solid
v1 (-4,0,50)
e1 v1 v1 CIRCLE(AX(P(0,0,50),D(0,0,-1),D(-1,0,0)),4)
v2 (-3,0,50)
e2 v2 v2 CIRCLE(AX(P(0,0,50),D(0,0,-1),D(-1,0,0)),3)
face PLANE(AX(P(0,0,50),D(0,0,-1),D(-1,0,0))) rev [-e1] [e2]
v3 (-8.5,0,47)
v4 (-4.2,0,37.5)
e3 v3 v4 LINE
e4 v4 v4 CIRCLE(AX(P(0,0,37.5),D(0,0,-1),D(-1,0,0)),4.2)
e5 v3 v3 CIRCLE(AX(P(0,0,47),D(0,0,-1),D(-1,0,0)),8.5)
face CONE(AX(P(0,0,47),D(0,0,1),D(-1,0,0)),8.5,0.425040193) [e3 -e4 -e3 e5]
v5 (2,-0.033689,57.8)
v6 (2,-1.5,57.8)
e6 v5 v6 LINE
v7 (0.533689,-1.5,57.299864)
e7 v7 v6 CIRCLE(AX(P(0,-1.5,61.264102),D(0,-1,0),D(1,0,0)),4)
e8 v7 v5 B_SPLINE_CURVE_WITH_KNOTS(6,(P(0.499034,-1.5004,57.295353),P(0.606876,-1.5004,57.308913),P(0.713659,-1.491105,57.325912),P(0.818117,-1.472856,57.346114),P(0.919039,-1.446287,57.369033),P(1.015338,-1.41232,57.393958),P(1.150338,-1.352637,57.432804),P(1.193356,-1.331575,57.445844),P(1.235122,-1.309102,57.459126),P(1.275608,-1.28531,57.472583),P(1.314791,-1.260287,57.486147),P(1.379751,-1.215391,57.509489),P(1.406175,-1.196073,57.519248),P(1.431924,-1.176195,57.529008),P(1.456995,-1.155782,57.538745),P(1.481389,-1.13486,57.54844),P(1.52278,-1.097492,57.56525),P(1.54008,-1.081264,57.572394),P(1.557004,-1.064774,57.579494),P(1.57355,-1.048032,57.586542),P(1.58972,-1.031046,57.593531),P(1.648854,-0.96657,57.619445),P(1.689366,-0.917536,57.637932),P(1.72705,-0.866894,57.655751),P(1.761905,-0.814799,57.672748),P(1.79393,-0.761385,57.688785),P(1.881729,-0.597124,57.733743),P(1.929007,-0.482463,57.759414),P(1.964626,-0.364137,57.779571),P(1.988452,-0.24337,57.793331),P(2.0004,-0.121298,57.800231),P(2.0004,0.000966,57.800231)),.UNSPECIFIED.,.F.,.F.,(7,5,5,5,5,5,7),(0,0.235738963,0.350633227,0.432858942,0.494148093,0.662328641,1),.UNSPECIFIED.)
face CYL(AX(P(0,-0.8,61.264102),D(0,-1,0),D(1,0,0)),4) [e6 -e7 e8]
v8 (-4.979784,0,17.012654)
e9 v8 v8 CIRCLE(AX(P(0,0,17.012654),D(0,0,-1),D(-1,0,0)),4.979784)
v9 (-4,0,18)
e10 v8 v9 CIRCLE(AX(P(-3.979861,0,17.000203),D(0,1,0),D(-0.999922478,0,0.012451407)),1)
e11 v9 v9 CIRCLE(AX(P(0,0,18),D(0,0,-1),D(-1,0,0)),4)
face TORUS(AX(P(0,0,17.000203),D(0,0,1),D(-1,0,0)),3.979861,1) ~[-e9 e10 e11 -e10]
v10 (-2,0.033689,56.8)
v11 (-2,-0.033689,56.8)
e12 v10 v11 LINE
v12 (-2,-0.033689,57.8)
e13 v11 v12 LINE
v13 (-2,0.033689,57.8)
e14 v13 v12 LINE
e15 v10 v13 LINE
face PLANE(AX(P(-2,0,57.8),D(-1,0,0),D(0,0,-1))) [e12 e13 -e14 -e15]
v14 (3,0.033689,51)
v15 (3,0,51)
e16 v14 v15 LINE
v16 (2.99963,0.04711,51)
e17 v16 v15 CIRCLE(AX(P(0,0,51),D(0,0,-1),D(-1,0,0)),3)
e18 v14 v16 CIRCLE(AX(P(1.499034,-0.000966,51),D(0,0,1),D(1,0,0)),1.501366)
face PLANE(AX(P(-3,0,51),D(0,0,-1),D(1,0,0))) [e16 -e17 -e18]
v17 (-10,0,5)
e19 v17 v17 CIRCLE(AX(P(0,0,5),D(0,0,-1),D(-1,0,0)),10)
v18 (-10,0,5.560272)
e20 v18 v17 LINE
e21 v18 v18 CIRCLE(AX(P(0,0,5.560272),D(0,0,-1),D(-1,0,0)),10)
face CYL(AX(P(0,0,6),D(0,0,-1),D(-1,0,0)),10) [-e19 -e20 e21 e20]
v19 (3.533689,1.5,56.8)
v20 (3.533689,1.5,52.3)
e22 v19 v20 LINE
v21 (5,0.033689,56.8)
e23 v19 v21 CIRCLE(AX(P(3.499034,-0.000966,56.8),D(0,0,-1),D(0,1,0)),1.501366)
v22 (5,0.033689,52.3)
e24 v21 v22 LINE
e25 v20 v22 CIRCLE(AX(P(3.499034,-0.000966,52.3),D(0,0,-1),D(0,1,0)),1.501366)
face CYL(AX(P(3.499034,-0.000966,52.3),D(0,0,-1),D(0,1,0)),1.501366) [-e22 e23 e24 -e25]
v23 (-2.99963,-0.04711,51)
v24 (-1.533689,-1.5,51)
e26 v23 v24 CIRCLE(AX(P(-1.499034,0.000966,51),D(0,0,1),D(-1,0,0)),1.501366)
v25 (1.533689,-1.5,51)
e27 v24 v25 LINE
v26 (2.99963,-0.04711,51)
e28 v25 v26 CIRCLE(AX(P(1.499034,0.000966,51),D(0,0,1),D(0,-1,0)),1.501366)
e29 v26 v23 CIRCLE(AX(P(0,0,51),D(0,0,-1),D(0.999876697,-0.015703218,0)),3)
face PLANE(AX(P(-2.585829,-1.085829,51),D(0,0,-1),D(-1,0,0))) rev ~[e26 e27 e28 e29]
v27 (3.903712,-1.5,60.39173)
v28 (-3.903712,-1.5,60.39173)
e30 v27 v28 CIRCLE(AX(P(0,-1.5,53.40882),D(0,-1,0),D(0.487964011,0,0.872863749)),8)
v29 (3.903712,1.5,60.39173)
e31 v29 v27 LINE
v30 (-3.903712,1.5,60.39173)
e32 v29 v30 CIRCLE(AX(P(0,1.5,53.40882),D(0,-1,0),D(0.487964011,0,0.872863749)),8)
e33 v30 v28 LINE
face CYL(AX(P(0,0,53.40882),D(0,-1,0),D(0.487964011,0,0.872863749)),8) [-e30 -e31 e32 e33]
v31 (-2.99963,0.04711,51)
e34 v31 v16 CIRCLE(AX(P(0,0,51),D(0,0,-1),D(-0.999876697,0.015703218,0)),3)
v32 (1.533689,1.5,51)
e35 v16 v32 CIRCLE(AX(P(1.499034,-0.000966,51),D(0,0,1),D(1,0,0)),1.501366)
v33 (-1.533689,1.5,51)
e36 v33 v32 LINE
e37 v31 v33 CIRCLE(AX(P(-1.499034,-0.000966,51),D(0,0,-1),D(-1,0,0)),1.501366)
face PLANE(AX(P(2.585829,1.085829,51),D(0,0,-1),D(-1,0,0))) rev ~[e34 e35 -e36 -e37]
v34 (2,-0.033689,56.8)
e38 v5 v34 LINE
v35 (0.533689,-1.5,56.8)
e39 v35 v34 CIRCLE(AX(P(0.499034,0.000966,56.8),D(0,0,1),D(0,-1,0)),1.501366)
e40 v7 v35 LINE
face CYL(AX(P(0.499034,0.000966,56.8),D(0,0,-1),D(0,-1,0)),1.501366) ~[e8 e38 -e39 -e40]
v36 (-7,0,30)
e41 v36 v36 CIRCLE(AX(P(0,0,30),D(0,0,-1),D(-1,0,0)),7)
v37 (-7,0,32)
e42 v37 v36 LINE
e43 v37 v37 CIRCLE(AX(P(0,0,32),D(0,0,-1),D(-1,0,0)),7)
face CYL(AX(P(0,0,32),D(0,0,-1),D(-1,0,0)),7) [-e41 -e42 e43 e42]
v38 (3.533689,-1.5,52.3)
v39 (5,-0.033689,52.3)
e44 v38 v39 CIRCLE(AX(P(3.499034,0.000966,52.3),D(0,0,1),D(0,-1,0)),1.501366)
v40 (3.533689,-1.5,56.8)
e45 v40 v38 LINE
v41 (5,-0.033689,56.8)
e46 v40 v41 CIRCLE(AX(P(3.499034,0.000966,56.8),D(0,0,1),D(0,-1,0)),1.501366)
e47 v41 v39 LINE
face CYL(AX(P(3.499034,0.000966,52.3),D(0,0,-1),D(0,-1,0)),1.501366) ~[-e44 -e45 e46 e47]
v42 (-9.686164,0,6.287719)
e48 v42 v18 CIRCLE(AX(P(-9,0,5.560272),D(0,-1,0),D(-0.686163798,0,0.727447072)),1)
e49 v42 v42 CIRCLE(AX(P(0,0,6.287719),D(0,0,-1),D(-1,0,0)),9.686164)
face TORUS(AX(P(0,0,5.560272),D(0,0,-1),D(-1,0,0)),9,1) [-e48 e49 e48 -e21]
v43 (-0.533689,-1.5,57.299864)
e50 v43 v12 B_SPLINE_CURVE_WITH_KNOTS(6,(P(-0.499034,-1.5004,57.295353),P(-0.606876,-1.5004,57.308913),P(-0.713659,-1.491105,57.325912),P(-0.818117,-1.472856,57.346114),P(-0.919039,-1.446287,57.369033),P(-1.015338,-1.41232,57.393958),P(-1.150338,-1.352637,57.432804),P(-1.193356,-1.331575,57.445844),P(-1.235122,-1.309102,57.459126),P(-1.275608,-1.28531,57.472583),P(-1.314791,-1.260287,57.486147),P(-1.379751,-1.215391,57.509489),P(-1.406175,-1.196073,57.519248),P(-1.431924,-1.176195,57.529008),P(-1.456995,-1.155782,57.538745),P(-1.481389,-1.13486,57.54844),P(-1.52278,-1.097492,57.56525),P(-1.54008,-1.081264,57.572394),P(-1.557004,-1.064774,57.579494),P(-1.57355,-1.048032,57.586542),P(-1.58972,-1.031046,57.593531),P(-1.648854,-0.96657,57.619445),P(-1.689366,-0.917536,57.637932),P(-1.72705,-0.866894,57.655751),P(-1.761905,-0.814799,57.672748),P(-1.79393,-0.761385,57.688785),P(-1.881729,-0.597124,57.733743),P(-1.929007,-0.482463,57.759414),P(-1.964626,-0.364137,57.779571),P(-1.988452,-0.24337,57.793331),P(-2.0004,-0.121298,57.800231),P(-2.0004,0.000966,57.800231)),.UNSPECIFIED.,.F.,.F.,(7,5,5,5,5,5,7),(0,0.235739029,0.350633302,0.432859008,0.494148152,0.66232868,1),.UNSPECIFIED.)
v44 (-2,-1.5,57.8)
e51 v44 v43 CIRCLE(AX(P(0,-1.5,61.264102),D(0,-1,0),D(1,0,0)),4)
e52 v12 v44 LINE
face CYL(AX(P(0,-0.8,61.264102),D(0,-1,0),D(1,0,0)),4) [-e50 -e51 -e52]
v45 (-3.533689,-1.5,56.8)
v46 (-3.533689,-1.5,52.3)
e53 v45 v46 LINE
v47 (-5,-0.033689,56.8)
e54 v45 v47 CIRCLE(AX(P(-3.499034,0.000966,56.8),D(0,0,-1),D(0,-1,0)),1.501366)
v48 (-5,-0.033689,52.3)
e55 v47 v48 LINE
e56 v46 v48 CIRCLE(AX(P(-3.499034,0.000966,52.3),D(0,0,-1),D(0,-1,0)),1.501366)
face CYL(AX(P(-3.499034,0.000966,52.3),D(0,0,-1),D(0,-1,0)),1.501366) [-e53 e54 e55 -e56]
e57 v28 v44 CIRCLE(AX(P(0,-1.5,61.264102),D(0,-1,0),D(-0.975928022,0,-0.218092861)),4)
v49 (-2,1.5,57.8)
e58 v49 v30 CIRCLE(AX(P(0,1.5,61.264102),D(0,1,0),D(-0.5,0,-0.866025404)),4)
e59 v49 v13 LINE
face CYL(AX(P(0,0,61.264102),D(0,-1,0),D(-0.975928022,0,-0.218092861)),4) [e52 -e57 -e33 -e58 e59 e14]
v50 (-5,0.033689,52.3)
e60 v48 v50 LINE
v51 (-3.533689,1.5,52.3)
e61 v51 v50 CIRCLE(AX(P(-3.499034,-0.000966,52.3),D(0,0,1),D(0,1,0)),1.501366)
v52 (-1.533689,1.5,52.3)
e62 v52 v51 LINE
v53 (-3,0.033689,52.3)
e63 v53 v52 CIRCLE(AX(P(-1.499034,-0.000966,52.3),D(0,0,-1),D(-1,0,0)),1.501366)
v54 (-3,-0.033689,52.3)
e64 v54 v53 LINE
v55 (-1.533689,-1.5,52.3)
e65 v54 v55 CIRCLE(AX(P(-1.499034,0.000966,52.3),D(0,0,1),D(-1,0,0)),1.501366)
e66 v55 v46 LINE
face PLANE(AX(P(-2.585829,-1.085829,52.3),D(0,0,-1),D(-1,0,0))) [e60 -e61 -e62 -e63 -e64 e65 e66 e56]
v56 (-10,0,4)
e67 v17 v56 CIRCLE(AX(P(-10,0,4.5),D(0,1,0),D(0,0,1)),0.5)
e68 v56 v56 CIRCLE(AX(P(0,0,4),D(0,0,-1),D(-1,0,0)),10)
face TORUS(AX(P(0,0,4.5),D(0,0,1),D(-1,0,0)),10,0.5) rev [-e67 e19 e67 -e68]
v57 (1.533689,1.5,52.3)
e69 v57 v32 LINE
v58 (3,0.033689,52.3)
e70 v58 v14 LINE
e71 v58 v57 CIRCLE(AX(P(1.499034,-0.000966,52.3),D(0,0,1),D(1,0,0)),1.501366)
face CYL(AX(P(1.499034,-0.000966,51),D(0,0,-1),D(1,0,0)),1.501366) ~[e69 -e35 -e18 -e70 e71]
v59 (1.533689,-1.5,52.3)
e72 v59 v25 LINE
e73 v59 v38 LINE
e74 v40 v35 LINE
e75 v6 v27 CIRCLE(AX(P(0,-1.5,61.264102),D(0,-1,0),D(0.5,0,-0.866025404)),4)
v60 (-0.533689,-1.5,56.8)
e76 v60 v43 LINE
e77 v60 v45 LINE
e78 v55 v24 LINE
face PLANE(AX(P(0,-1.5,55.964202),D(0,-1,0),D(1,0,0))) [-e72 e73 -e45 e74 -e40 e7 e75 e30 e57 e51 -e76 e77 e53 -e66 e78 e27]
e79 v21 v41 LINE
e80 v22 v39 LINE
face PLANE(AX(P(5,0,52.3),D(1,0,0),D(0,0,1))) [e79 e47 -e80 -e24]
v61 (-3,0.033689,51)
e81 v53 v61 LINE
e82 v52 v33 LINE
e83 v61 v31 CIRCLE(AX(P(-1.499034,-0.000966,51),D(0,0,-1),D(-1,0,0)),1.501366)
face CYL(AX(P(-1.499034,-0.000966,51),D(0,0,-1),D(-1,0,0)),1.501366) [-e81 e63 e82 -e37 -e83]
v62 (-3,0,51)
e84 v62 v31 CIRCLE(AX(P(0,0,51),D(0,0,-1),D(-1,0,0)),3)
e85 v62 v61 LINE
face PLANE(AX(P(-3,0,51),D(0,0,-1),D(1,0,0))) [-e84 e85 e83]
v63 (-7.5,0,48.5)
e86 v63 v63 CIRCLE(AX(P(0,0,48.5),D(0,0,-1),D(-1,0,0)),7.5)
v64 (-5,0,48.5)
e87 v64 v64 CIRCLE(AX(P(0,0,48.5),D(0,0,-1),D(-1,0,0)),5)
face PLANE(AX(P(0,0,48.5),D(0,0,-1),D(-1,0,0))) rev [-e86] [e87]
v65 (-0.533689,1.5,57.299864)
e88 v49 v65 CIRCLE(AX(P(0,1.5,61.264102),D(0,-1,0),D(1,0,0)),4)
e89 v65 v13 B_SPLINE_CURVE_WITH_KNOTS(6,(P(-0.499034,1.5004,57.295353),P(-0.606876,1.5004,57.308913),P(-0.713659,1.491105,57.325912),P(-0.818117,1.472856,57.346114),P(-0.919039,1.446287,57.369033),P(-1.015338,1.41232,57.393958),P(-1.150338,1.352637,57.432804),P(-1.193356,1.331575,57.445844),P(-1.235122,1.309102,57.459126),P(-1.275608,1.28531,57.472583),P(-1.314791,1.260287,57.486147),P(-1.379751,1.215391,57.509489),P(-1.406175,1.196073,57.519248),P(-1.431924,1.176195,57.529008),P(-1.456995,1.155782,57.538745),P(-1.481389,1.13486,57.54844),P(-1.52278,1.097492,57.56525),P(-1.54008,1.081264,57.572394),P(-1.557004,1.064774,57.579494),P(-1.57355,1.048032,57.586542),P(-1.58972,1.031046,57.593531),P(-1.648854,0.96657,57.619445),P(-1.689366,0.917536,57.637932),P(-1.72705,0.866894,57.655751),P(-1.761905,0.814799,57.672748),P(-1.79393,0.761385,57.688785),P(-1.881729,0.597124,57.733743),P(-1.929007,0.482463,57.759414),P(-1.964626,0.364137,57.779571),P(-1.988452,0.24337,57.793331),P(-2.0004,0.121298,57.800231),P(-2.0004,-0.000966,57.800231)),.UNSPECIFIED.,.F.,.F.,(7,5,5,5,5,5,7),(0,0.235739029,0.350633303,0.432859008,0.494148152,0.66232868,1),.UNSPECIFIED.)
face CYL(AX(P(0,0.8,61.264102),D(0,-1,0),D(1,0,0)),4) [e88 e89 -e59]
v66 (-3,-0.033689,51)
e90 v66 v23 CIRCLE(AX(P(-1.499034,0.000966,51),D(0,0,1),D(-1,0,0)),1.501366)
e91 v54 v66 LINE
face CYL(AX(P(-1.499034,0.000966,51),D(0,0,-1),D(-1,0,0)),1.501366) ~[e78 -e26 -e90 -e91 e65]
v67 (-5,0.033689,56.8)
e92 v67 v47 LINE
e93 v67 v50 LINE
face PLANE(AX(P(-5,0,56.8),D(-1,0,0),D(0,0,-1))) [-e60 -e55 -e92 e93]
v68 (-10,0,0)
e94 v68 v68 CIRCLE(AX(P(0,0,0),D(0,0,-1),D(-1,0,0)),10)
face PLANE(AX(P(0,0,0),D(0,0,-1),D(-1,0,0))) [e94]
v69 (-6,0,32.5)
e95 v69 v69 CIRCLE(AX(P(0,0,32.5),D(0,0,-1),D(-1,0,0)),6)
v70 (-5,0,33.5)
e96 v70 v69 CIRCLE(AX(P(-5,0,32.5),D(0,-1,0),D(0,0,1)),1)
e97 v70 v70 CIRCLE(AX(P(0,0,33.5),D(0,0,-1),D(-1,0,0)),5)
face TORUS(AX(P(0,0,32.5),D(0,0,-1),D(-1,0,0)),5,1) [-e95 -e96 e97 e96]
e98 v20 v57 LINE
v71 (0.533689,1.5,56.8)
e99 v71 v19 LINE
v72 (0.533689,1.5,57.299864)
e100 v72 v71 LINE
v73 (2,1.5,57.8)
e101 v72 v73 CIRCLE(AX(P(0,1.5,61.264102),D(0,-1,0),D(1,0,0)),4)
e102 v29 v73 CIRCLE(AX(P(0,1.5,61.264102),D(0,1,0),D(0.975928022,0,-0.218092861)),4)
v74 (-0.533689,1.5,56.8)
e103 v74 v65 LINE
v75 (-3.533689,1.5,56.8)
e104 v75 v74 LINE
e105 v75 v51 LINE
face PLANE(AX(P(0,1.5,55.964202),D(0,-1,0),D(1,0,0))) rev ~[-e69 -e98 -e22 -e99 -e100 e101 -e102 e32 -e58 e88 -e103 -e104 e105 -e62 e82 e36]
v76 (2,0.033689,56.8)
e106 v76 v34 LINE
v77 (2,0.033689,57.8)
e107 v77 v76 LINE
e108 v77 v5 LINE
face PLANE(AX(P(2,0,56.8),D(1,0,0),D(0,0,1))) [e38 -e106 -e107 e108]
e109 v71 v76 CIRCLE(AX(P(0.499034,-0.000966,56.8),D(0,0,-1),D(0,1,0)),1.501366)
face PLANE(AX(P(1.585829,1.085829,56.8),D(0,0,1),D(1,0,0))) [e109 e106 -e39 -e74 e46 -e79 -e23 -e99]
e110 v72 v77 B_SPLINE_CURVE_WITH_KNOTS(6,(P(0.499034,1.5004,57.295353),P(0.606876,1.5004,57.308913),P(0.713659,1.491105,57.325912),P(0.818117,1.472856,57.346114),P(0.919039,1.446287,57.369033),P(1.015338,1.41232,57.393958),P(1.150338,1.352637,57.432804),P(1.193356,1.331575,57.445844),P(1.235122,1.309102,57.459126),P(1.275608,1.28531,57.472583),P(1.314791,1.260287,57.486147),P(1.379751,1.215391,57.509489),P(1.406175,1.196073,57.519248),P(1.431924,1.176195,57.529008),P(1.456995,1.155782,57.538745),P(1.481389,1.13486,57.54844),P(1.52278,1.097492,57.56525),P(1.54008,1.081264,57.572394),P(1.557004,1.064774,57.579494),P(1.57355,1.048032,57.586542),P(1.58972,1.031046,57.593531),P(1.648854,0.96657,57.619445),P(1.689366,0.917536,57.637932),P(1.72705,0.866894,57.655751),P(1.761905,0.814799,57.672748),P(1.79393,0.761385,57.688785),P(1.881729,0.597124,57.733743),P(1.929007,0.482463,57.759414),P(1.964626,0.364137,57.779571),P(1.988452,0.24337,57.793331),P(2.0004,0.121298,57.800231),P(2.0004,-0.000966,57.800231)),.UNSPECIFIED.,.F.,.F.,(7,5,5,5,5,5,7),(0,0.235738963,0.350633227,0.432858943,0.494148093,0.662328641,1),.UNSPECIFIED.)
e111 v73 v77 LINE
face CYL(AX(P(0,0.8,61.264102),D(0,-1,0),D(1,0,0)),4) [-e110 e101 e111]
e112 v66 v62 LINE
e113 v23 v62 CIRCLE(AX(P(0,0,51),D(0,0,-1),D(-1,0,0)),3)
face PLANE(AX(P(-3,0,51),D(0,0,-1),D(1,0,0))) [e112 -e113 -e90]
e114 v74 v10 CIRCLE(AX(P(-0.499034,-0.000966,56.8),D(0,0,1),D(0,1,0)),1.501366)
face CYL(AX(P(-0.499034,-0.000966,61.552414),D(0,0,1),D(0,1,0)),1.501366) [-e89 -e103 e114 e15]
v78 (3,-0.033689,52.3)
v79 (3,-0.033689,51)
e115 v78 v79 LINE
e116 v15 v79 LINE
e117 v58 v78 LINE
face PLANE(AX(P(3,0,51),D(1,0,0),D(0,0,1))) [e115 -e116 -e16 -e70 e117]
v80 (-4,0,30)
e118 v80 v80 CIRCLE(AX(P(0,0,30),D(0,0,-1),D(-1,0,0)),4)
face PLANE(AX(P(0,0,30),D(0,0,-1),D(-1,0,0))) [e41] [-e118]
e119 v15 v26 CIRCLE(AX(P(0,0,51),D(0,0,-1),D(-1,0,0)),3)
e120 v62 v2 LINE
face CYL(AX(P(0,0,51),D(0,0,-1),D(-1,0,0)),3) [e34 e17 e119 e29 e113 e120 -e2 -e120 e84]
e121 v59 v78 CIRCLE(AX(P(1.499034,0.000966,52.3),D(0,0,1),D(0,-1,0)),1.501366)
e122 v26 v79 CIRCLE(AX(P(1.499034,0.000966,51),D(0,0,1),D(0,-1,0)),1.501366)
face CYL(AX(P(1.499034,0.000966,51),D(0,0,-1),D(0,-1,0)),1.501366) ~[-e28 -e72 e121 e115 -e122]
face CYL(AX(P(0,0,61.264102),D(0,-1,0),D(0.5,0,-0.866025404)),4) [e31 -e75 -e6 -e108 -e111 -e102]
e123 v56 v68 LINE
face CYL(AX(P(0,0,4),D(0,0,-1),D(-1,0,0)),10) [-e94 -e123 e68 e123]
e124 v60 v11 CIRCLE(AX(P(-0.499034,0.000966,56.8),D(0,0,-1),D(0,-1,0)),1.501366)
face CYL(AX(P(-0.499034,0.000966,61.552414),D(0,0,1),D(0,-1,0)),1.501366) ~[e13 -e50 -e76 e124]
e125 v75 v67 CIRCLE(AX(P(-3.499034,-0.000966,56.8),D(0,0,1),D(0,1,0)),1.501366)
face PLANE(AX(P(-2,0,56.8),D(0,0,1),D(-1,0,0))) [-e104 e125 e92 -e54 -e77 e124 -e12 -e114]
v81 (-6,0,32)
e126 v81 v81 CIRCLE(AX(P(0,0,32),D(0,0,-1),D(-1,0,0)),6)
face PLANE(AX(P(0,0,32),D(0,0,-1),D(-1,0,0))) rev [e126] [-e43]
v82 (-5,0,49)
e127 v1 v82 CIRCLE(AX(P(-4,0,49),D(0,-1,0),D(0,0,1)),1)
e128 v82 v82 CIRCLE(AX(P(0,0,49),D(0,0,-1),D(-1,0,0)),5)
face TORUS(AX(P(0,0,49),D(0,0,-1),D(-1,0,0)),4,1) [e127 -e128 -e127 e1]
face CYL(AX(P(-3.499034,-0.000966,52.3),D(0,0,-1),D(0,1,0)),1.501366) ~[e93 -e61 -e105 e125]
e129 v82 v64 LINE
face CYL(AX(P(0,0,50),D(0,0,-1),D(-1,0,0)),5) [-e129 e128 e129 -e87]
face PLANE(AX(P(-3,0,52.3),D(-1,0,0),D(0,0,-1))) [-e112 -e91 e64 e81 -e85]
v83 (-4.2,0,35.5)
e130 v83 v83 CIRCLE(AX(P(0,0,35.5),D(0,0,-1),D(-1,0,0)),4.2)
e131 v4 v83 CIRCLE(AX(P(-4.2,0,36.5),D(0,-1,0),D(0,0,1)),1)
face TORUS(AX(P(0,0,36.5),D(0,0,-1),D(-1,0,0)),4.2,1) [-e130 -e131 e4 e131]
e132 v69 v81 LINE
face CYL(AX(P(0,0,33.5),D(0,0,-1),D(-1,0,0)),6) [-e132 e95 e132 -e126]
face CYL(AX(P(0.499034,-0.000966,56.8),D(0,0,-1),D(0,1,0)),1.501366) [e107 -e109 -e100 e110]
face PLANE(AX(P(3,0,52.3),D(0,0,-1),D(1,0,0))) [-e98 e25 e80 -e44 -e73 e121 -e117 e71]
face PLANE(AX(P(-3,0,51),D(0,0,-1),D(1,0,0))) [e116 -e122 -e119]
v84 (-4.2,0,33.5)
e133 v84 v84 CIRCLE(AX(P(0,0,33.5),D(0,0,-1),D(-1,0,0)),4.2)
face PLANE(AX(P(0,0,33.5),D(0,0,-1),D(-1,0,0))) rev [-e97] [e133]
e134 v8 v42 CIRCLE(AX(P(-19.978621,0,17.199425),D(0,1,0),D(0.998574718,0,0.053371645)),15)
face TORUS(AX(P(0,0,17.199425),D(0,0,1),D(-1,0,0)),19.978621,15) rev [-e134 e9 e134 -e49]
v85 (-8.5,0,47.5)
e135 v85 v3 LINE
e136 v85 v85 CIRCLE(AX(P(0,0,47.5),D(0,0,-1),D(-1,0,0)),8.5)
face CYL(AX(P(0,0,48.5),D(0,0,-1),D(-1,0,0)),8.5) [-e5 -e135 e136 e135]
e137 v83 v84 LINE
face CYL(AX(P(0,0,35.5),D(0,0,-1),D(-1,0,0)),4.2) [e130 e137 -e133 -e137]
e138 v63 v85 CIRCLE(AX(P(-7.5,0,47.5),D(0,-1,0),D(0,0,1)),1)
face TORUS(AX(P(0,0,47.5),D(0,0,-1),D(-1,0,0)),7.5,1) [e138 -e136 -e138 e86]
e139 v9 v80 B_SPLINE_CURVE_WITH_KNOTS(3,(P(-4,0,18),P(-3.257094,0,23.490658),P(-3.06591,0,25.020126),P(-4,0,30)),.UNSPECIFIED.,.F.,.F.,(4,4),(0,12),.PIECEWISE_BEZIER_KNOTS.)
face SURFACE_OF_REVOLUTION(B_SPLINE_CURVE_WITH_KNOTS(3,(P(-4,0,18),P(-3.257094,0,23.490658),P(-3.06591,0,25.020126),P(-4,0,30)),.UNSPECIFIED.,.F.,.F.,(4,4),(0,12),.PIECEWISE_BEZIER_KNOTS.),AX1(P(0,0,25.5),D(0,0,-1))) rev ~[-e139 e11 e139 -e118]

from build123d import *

# Parameters (mm, degrees)
F4_DEPTH     = 1.5
F5_T1_DEPTH  = 4.5
F5_T3_DEPTH  = 1.3
F5_T8_DEPTH  = 4.7524143468
F5_S9_R      = 4
F5_T10_DEPTH = 4
F5_T14_DEPTH = 4.7524143468
F5_S15_R     = 4
F5_T16_DEPTH = 4
F5_T20_DEPTH = 4.7524143468
F5_S21_R     = 4
F5_T22_DEPTH = 4
F5_T26_DEPTH = 4.7524143468
F5_S27_R     = 4
F5_T28_DEPTH = 4


# Not quite as in the source:
# - a fillet or chamfer that OpenCascade refuses, or shapes differently, is made with other operations: its cross-section is extruded or revolved along the edge and cut away or added


with BuildPart() as f1:
    # F0 (on Front) → F1 (revolve)
    with BuildSketch(Plane.XZ):
        with BuildLine():
            Line((-10, 0), (0, 0))
            Line((0, 0), (0, 51))
            Line((0, 51), (-3, 51))
            Line((-3, 51), (-3, 50))
            Line((-3, 50), (-5, 50))
            Line((-5, 50), (-5, 48.5))
            Line((-5, 48.5), (-8.5, 48.5))
            Line((-8.5, 48.5), (-8.5, 47))
            Line((-8.5, 47), (-4.2, 37.5))
            ThreePointArc((-4.2, 37.5), (-5.2, 36.5), (-4.2, 35.5))
            Line((-4.2, 35.5), (-4.2, 33.5))
            Line((-4.2, 33.5), (-6, 33.5))
            Line((-6, 33.5), (-6, 32))
            Line((-6, 32), (-7, 32))
            Line((-7, 32), (-7, 30))
            Line((-7, 30), (-4, 30))
            add(Edge.make_bspline(
                [(-4, 18), (-3.2570937183, 23.4906580299), (-3.0659101903, 25.0201262534), (-4, 30)],
                knots=[0, 0, 0, 0, 12, 12, 12, 12], degree=3))
            Line((-4, 18), (-5, 18))
            ThreePointArc((-5, 18), (-6.1324669242, 11.4301945518), (-10, 6))
            Line((-10, 6), (-10, 5))
            ThreePointArc((-10, 5), (-9.5, 4.5), (-10, 4))
            Line((-10, 4), (-10, 0))
        make_face()
    revolve(axis=Axis((0, 0, 25.5), (0, 0, -1)))

    # F2: fillet of radius 1 on 5 edges, made by hand

    # F2_s1 → F2_t2 (revolve, cut)
    with BuildSketch(Plane.XZ):
        with BuildLine():
            ThreePointArc((-9.6861637982, 6.2877192457), (-9.9181949135, 5.9564010683), (-10, 5.560272174))
            Line((-10, 5.560272174), (-10, 6))
            ThreePointArc((-10, 6), (-9.8420610087, 6.1427460638), (-9.6861637982, 6.2877192457))
        make_face()
    revolve(axis=Axis((0, 0, 6), (0, 0, -1)), mode=Mode.SUBTRACT)

    # F2_s3 → F2_t4 (revolve, cut)
    with BuildSketch(Plane.XZ):
        with BuildLine():
            ThreePointArc((-4.979783597, 17.0126542149), (-4.6896809685, 17.7045860706), (-4, 18))
            Line((-4, 18), (-5, 18))
            ThreePointArc((-5, 18), (-4.9817641292, 17.5064935256), (-4.979783597, 17.0126542149))
        make_face()
    revolve(axis=Axis((0, 0, 18), (0, 0, -1)), mode=Mode.SUBTRACT)

    # F2_s5 → F2_t6 (revolve, cut)
    with BuildSketch(Plane.XZ):
        with BuildLine():
            ThreePointArc((-5, 33.5), (-5.7071067812, 33.2071067812), (-6, 32.5))
            Line((-6, 32.5), (-6, 33.5))
            Line((-6, 33.5), (-5, 33.5))
        make_face()
    revolve(axis=Axis((0, 0, 33.5), (0, 0, -1)), mode=Mode.SUBTRACT)

    # F2_s7 → F2_t8 (revolve, cut)
    with BuildSketch(Plane.XZ):
        with BuildLine():
            ThreePointArc((-7.5, 48.5), (-8.2071067812, 48.2071067812), (-8.5, 47.5))
            Line((-8.5, 47.5), (-8.5, 48.5))
            Line((-8.5, 48.5), (-7.5, 48.5))
        make_face()
    revolve(axis=Axis((0, 0, 48.5), (0, 0, -1)), mode=Mode.SUBTRACT)

    # F2_s9 → F2_t10 (revolve, cut)
    with BuildSketch(Plane.XZ):
        with BuildLine():
            ThreePointArc((-4, 50), (-4.7071067812, 49.7071067812), (-5, 49))
            Line((-5, 49), (-5, 50))
            Line((-5, 50), (-4, 50))
        make_face()
    revolve(axis=Axis((0, 0, 50), (0, 0, -1)), mode=Mode.SUBTRACT)

    # F3 (on Front) → F4 (join, symmetric)
    with BuildSketch(Plane.XZ):
        with BuildLine():
            Line((-3, 51), (0, 51))
            Line((0, 51), (3, 51))
            Line((3, 51), (3, 52.3))
            Line((3, 52.3), (5, 52.3))
            Line((5, 52.3), (5, 56.8))
            Line((5, 56.8), (2, 56.8))
            Line((2, 56.8), (2, 57.8))
            ThreePointArc((2, 57.8), (3.2237742518, 58.8961321107), (3.903712088, 60.3917301725))
            ThreePointArc((3.903712088, 60.3917301725), (0, 61.4088201821), (-3.903712088, 60.3917301725))
            ThreePointArc((-3.903712088, 60.3917301725), (-3.2237742518, 58.8961321107), (-2, 57.8))
            Line((-2, 57.8), (-2, 56.8))
            Line((-2, 56.8), (-5, 56.8))
            Line((-5, 56.8), (-5, 52.3))
            Line((-5, 52.3), (-3, 52.3))
            Line((-3, 52.3), (-3, 51))
        make_face()
    extrude(amount=F4_DEPTH, both=True)

    # F5: fillet of radius 1.5 on 12 edges, made by hand

    # F5_s2 → F5_t1 (cut)
    with BuildSketch(Plane.XY.offset(52.3)):
        with BuildLine():
            ThreePointArc((-3.4990343146, -1.5004), (-4.5606601718, -1.0606601718), (-5.0004, 0.0009656854))
            Line((-5.0004, 0.0009656854), (-5.1505365685, 0.0009656854))
            ThreePointArc((-5.1505365685, 0.0009656854), (-5.1501365685, -0.7495171573), (-5.1501365685, -1.5))
            Line((-5.1501365685, -1.5), (-5, -1.6501365685))
            ThreePointArc((-5, -1.6501365685), (-4.2495171573, -1.6501365685), (-3.4990343146, -1.6505365685))
            Line((-3.4990343146, -1.6505365685), (-3.4990343146, -1.5004))
        make_face()
        with BuildLine():
            ThreePointArc((-3.4990343146, 1.5004), (-4.5606601718, 1.0606601718), (-5.0004, -0.0009656854))
            Line((-5.0004, -0.0009656854), (-5.1505365685, -0.0009656854))
            ThreePointArc((-5.1505365685, -0.0009656854), (-5.1501365685, 0.7495171573), (-5.1501365685, 1.5))
            Line((-5.1501365685, 1.5), (-5, 1.6501365685))
            ThreePointArc((-5, 1.6501365685), (-4.2495171573, 1.6501365685), (-3.4990343146, 1.6505365685))
            Line((-3.4990343146, 1.6505365685), (-3.4990343146, 1.5004))
        make_face()
        with BuildLine():
            ThreePointArc((3.4990343146, -1.5004), (4.5606601718, -1.0606601718), (5.0004, 0.0009656854))
            Line((5.0004, 0.0009656854), (5.1505365685, 0.0009656854))
            ThreePointArc((5.1505365685, 0.0009656854), (5.1501365685, -0.7495171573), (5.1501365685, -1.5))
            Line((5.1501365685, -1.5), (5, -1.6501365685))
            ThreePointArc((5, -1.6501365685), (4.2495171573, -1.6501365685), (3.4990343146, -1.6505365685))
            Line((3.4990343146, -1.6505365685), (3.4990343146, -1.5004))
        make_face()
        with BuildLine():
            ThreePointArc((3.4990343146, 1.5004), (4.5606601718, 1.0606601718), (5.0004, -0.0009656854))
            Line((5.0004, -0.0009656854), (5.1505365685, -0.0009656854))
            ThreePointArc((5.1505365685, -0.0009656854), (5.1501365685, 0.7495171573), (5.1501365685, 1.5))
            Line((5.1501365685, 1.5), (5, 1.6501365685))
            ThreePointArc((5, 1.6501365685), (4.2495171573, 1.6501365685), (3.4990343146, 1.6505365685))
            Line((3.4990343146, 1.6505365685), (3.4990343146, 1.5004))
        make_face()
    extrude(amount=F5_T1_DEPTH, mode=Mode.SUBTRACT)

    # F5_s4 → F5_t3 (cut)
    with BuildSketch(Plane.XY.offset(51)):
        with BuildLine():
            ThreePointArc((3.0004, -0.0009656854), (2.5606601718, 1.0606601718), (1.4990343146, 1.5004))
            Line((1.4990343146, 1.5004), (1.4990343146, 1.6505365685))
            ThreePointArc((1.4990343146, 1.6505365685), (2.2495171573, 1.6501365685), (3, 1.6501365685))
            Line((3, 1.6501365685), (3.1501365685, 1.5))
            ThreePointArc((3.1501365685, 1.5), (3.1501365685, 0.7495171573), (3.1505365685, -0.0009656854))
            Line((3.1505365685, -0.0009656854), (3.0004, -0.0009656854))
        make_face()
        with BuildLine():
            ThreePointArc((1.4990343146, -1.5004), (2.5606601718, -1.0606601718), (3.0004, 0.0009656854))
            Line((3.0004, 0.0009656854), (3.1505365685, 0.0009656854))
            ThreePointArc((3.1505365685, 0.0009656854), (3.1501365685, -0.7495171573), (3.1501365685, -1.5))
            Line((3.1501365685, -1.5), (3, -1.6501365685))
            ThreePointArc((3, -1.6501365685), (2.2495171573, -1.6501365685), (1.4990343146, -1.6505365685))
            Line((1.4990343146, -1.6505365685), (1.4990343146, -1.5004))
        make_face()
        with BuildLine():
            ThreePointArc((-3.0004, 0.0009656854), (-2.5606601718, -1.0606601718), (-1.4990343146, -1.5004))
            Line((-1.4990343146, -1.5004), (-1.4990343146, -1.6505365685))
            ThreePointArc((-1.4990343146, -1.6505365685), (-2.2495171573, -1.6501365685), (-3, -1.6501365685))
            Line((-3, -1.6501365685), (-3.1501365685, -1.5))
            ThreePointArc((-3.1501365685, -1.5), (-3.1501365685, -0.7495171573), (-3.1505365685, 0.0009656854))
            Line((-3.1505365685, 0.0009656854), (-3.0004, 0.0009656854))
        make_face()
        with BuildLine():
            ThreePointArc((-3.0004, -0.0009656854), (-2.5606601718, 1.0606601718), (-1.4990343146, 1.5004))
            Line((-1.4990343146, 1.5004), (-1.4990343146, 1.6505365685))
            ThreePointArc((-1.4990343146, 1.6505365685), (-2.2495171573, 1.6501365685), (-3, 1.6501365685))
            Line((-3, 1.6501365685), (-3.1501365685, 1.5))
            ThreePointArc((-3.1501365685, 1.5), (-3.1501365685, 0.7495171573), (-3.1505365685, -0.0009656854))
            Line((-3.1505365685, -0.0009656854), (-3.0004, -0.0009656854))
        make_face()
    extrude(amount=F5_T3_DEPTH, mode=Mode.SUBTRACT)


with BuildPart() as f5_tool6:
    # F5_s7 → F5_t8 (new body)
    with BuildSketch(Plane.XY.offset(61.5524143468)):
        with BuildLine():
            ThreePointArc((-0.4990343146, -1.5004), (-1.5606601718, -1.0606601718), (-2.0004, 0.0009656854))
            Line((-2.0004, 0.0009656854), (-2.1505365685, 0.0009656854))
            ThreePointArc((-2.1505365685, 0.0009656854), (-2.1501365685, -0.7495171573), (-2.1501365685, -1.5))
            Line((-2.1501365685, -1.5), (-2, -1.6501365685))
            ThreePointArc((-2, -1.6501365685), (-1.2495171573, -1.6501365685), (-0.4990343146, -1.6505365685))
            Line((-0.4990343146, -1.6505365685), (-0.4990343146, -1.5004))
        make_face()
    extrude(amount=-F5_T8_DEPTH)

    # F5_s9 → F5_t10 (cut, symmetric)
    with BuildSketch(Plane.XZ.offset(0.8)):
        with Locations((0, 61.2641016151)):
            Circle(F5_S9_R)
    extrude(amount=F5_T10_DEPTH, both=True, mode=Mode.SUBTRACT)


with BuildPart() as f1_1:
    add(f1.part)

    # F5_t5: cut F5_tool6
    add(f5_tool6.part, mode=Mode.SUBTRACT)


with BuildPart() as f5_tool12:
    # F5_s13 → F5_t14 (new body)
    with BuildSketch(Plane.XY.offset(56.8)):
        with BuildLine():
            ThreePointArc((0.4990343146, -1.5004), (1.5606601718, -1.0606601718), (2.0004, 0.0009656854))
            Line((2.0004, 0.0009656854), (2.1505365685, 0.0009656854))
            ThreePointArc((2.1505365685, 0.0009656854), (2.1501365685, -0.7495171573), (2.1501365685, -1.5))
            Line((2.1501365685, -1.5), (2, -1.6501365685))
            ThreePointArc((2, -1.6501365685), (1.2495171573, -1.6501365685), (0.4990343146, -1.6505365685))
            Line((0.4990343146, -1.6505365685), (0.4990343146, -1.5004))
        make_face()
    extrude(amount=F5_T14_DEPTH)

    # F5_s15 → F5_t16 (cut, symmetric)
    with BuildSketch(Plane.XZ.offset(0.8)):
        with Locations((0, 61.2641016151)):
            Circle(F5_S15_R)
    extrude(amount=F5_T16_DEPTH, both=True, mode=Mode.SUBTRACT)


with BuildPart() as f1_2:
    add(f1_1.part)

    # F5_t11: cut F5_tool12
    add(f5_tool12.part, mode=Mode.SUBTRACT)


with BuildPart() as f5_tool18:
    # F5_s19 → F5_t20 (new body)
    with BuildSketch(Plane.XY.offset(61.5524143468)):
        with BuildLine():
            ThreePointArc((-0.4990343146, 1.5004), (-1.5606601718, 1.0606601718), (-2.0004, -0.0009656854))
            Line((-2.0004, -0.0009656854), (-2.1505365685, -0.0009656854))
            ThreePointArc((-2.1505365685, -0.0009656854), (-2.1501365685, 0.7495171573), (-2.1501365685, 1.5))
            Line((-2.1501365685, 1.5), (-2, 1.6501365685))
            ThreePointArc((-2, 1.6501365685), (-1.2495171573, 1.6501365685), (-0.4990343146, 1.6505365685))
            Line((-0.4990343146, 1.6505365685), (-0.4990343146, 1.5004))
        make_face()
    extrude(amount=-F5_T20_DEPTH)

    # F5_s21 → F5_t22 (cut, symmetric)
    with BuildSketch(Plane.XZ.offset(-0.8)):
        with Locations((0, 61.2641016151)):
            Circle(F5_S21_R)
    extrude(amount=F5_T22_DEPTH, both=True, mode=Mode.SUBTRACT)


with BuildPart() as f1_3:
    add(f1_2.part)

    # F5_t17: cut F5_tool18
    add(f5_tool18.part, mode=Mode.SUBTRACT)


with BuildPart() as f5_tool24:
    # F5_s25 → F5_t26 (new body)
    with BuildSketch(Plane.XY.offset(56.8)):
        with BuildLine():
            ThreePointArc((0.4990343146, 1.5004), (1.5606601718, 1.0606601718), (2.0004, -0.0009656854))
            Line((2.0004, -0.0009656854), (2.1505365685, -0.0009656854))
            ThreePointArc((2.1505365685, -0.0009656854), (2.1501365685, 0.7495171573), (2.1501365685, 1.5))
            Line((2.1501365685, 1.5), (2, 1.6501365685))
            ThreePointArc((2, 1.6501365685), (1.2495171573, 1.6501365685), (0.4990343146, 1.6505365685))
            Line((0.4990343146, 1.6505365685), (0.4990343146, 1.5004))
        make_face()
    extrude(amount=F5_T26_DEPTH)

    # F5_s27 → F5_t28 (cut, symmetric)
    with BuildSketch(Plane.XZ.offset(-0.8)):
        with Locations((0, 61.2641016151)):
            Circle(F5_S27_R)
    extrude(amount=F5_T28_DEPTH, both=True, mode=Mode.SUBTRACT)


with BuildPart() as f1_4:
    add(f1_3.part)

    # F5_t23: cut F5_tool24
    add(f5_tool24.part, mode=Mode.SUBTRACT)


solid = f1_4.part
